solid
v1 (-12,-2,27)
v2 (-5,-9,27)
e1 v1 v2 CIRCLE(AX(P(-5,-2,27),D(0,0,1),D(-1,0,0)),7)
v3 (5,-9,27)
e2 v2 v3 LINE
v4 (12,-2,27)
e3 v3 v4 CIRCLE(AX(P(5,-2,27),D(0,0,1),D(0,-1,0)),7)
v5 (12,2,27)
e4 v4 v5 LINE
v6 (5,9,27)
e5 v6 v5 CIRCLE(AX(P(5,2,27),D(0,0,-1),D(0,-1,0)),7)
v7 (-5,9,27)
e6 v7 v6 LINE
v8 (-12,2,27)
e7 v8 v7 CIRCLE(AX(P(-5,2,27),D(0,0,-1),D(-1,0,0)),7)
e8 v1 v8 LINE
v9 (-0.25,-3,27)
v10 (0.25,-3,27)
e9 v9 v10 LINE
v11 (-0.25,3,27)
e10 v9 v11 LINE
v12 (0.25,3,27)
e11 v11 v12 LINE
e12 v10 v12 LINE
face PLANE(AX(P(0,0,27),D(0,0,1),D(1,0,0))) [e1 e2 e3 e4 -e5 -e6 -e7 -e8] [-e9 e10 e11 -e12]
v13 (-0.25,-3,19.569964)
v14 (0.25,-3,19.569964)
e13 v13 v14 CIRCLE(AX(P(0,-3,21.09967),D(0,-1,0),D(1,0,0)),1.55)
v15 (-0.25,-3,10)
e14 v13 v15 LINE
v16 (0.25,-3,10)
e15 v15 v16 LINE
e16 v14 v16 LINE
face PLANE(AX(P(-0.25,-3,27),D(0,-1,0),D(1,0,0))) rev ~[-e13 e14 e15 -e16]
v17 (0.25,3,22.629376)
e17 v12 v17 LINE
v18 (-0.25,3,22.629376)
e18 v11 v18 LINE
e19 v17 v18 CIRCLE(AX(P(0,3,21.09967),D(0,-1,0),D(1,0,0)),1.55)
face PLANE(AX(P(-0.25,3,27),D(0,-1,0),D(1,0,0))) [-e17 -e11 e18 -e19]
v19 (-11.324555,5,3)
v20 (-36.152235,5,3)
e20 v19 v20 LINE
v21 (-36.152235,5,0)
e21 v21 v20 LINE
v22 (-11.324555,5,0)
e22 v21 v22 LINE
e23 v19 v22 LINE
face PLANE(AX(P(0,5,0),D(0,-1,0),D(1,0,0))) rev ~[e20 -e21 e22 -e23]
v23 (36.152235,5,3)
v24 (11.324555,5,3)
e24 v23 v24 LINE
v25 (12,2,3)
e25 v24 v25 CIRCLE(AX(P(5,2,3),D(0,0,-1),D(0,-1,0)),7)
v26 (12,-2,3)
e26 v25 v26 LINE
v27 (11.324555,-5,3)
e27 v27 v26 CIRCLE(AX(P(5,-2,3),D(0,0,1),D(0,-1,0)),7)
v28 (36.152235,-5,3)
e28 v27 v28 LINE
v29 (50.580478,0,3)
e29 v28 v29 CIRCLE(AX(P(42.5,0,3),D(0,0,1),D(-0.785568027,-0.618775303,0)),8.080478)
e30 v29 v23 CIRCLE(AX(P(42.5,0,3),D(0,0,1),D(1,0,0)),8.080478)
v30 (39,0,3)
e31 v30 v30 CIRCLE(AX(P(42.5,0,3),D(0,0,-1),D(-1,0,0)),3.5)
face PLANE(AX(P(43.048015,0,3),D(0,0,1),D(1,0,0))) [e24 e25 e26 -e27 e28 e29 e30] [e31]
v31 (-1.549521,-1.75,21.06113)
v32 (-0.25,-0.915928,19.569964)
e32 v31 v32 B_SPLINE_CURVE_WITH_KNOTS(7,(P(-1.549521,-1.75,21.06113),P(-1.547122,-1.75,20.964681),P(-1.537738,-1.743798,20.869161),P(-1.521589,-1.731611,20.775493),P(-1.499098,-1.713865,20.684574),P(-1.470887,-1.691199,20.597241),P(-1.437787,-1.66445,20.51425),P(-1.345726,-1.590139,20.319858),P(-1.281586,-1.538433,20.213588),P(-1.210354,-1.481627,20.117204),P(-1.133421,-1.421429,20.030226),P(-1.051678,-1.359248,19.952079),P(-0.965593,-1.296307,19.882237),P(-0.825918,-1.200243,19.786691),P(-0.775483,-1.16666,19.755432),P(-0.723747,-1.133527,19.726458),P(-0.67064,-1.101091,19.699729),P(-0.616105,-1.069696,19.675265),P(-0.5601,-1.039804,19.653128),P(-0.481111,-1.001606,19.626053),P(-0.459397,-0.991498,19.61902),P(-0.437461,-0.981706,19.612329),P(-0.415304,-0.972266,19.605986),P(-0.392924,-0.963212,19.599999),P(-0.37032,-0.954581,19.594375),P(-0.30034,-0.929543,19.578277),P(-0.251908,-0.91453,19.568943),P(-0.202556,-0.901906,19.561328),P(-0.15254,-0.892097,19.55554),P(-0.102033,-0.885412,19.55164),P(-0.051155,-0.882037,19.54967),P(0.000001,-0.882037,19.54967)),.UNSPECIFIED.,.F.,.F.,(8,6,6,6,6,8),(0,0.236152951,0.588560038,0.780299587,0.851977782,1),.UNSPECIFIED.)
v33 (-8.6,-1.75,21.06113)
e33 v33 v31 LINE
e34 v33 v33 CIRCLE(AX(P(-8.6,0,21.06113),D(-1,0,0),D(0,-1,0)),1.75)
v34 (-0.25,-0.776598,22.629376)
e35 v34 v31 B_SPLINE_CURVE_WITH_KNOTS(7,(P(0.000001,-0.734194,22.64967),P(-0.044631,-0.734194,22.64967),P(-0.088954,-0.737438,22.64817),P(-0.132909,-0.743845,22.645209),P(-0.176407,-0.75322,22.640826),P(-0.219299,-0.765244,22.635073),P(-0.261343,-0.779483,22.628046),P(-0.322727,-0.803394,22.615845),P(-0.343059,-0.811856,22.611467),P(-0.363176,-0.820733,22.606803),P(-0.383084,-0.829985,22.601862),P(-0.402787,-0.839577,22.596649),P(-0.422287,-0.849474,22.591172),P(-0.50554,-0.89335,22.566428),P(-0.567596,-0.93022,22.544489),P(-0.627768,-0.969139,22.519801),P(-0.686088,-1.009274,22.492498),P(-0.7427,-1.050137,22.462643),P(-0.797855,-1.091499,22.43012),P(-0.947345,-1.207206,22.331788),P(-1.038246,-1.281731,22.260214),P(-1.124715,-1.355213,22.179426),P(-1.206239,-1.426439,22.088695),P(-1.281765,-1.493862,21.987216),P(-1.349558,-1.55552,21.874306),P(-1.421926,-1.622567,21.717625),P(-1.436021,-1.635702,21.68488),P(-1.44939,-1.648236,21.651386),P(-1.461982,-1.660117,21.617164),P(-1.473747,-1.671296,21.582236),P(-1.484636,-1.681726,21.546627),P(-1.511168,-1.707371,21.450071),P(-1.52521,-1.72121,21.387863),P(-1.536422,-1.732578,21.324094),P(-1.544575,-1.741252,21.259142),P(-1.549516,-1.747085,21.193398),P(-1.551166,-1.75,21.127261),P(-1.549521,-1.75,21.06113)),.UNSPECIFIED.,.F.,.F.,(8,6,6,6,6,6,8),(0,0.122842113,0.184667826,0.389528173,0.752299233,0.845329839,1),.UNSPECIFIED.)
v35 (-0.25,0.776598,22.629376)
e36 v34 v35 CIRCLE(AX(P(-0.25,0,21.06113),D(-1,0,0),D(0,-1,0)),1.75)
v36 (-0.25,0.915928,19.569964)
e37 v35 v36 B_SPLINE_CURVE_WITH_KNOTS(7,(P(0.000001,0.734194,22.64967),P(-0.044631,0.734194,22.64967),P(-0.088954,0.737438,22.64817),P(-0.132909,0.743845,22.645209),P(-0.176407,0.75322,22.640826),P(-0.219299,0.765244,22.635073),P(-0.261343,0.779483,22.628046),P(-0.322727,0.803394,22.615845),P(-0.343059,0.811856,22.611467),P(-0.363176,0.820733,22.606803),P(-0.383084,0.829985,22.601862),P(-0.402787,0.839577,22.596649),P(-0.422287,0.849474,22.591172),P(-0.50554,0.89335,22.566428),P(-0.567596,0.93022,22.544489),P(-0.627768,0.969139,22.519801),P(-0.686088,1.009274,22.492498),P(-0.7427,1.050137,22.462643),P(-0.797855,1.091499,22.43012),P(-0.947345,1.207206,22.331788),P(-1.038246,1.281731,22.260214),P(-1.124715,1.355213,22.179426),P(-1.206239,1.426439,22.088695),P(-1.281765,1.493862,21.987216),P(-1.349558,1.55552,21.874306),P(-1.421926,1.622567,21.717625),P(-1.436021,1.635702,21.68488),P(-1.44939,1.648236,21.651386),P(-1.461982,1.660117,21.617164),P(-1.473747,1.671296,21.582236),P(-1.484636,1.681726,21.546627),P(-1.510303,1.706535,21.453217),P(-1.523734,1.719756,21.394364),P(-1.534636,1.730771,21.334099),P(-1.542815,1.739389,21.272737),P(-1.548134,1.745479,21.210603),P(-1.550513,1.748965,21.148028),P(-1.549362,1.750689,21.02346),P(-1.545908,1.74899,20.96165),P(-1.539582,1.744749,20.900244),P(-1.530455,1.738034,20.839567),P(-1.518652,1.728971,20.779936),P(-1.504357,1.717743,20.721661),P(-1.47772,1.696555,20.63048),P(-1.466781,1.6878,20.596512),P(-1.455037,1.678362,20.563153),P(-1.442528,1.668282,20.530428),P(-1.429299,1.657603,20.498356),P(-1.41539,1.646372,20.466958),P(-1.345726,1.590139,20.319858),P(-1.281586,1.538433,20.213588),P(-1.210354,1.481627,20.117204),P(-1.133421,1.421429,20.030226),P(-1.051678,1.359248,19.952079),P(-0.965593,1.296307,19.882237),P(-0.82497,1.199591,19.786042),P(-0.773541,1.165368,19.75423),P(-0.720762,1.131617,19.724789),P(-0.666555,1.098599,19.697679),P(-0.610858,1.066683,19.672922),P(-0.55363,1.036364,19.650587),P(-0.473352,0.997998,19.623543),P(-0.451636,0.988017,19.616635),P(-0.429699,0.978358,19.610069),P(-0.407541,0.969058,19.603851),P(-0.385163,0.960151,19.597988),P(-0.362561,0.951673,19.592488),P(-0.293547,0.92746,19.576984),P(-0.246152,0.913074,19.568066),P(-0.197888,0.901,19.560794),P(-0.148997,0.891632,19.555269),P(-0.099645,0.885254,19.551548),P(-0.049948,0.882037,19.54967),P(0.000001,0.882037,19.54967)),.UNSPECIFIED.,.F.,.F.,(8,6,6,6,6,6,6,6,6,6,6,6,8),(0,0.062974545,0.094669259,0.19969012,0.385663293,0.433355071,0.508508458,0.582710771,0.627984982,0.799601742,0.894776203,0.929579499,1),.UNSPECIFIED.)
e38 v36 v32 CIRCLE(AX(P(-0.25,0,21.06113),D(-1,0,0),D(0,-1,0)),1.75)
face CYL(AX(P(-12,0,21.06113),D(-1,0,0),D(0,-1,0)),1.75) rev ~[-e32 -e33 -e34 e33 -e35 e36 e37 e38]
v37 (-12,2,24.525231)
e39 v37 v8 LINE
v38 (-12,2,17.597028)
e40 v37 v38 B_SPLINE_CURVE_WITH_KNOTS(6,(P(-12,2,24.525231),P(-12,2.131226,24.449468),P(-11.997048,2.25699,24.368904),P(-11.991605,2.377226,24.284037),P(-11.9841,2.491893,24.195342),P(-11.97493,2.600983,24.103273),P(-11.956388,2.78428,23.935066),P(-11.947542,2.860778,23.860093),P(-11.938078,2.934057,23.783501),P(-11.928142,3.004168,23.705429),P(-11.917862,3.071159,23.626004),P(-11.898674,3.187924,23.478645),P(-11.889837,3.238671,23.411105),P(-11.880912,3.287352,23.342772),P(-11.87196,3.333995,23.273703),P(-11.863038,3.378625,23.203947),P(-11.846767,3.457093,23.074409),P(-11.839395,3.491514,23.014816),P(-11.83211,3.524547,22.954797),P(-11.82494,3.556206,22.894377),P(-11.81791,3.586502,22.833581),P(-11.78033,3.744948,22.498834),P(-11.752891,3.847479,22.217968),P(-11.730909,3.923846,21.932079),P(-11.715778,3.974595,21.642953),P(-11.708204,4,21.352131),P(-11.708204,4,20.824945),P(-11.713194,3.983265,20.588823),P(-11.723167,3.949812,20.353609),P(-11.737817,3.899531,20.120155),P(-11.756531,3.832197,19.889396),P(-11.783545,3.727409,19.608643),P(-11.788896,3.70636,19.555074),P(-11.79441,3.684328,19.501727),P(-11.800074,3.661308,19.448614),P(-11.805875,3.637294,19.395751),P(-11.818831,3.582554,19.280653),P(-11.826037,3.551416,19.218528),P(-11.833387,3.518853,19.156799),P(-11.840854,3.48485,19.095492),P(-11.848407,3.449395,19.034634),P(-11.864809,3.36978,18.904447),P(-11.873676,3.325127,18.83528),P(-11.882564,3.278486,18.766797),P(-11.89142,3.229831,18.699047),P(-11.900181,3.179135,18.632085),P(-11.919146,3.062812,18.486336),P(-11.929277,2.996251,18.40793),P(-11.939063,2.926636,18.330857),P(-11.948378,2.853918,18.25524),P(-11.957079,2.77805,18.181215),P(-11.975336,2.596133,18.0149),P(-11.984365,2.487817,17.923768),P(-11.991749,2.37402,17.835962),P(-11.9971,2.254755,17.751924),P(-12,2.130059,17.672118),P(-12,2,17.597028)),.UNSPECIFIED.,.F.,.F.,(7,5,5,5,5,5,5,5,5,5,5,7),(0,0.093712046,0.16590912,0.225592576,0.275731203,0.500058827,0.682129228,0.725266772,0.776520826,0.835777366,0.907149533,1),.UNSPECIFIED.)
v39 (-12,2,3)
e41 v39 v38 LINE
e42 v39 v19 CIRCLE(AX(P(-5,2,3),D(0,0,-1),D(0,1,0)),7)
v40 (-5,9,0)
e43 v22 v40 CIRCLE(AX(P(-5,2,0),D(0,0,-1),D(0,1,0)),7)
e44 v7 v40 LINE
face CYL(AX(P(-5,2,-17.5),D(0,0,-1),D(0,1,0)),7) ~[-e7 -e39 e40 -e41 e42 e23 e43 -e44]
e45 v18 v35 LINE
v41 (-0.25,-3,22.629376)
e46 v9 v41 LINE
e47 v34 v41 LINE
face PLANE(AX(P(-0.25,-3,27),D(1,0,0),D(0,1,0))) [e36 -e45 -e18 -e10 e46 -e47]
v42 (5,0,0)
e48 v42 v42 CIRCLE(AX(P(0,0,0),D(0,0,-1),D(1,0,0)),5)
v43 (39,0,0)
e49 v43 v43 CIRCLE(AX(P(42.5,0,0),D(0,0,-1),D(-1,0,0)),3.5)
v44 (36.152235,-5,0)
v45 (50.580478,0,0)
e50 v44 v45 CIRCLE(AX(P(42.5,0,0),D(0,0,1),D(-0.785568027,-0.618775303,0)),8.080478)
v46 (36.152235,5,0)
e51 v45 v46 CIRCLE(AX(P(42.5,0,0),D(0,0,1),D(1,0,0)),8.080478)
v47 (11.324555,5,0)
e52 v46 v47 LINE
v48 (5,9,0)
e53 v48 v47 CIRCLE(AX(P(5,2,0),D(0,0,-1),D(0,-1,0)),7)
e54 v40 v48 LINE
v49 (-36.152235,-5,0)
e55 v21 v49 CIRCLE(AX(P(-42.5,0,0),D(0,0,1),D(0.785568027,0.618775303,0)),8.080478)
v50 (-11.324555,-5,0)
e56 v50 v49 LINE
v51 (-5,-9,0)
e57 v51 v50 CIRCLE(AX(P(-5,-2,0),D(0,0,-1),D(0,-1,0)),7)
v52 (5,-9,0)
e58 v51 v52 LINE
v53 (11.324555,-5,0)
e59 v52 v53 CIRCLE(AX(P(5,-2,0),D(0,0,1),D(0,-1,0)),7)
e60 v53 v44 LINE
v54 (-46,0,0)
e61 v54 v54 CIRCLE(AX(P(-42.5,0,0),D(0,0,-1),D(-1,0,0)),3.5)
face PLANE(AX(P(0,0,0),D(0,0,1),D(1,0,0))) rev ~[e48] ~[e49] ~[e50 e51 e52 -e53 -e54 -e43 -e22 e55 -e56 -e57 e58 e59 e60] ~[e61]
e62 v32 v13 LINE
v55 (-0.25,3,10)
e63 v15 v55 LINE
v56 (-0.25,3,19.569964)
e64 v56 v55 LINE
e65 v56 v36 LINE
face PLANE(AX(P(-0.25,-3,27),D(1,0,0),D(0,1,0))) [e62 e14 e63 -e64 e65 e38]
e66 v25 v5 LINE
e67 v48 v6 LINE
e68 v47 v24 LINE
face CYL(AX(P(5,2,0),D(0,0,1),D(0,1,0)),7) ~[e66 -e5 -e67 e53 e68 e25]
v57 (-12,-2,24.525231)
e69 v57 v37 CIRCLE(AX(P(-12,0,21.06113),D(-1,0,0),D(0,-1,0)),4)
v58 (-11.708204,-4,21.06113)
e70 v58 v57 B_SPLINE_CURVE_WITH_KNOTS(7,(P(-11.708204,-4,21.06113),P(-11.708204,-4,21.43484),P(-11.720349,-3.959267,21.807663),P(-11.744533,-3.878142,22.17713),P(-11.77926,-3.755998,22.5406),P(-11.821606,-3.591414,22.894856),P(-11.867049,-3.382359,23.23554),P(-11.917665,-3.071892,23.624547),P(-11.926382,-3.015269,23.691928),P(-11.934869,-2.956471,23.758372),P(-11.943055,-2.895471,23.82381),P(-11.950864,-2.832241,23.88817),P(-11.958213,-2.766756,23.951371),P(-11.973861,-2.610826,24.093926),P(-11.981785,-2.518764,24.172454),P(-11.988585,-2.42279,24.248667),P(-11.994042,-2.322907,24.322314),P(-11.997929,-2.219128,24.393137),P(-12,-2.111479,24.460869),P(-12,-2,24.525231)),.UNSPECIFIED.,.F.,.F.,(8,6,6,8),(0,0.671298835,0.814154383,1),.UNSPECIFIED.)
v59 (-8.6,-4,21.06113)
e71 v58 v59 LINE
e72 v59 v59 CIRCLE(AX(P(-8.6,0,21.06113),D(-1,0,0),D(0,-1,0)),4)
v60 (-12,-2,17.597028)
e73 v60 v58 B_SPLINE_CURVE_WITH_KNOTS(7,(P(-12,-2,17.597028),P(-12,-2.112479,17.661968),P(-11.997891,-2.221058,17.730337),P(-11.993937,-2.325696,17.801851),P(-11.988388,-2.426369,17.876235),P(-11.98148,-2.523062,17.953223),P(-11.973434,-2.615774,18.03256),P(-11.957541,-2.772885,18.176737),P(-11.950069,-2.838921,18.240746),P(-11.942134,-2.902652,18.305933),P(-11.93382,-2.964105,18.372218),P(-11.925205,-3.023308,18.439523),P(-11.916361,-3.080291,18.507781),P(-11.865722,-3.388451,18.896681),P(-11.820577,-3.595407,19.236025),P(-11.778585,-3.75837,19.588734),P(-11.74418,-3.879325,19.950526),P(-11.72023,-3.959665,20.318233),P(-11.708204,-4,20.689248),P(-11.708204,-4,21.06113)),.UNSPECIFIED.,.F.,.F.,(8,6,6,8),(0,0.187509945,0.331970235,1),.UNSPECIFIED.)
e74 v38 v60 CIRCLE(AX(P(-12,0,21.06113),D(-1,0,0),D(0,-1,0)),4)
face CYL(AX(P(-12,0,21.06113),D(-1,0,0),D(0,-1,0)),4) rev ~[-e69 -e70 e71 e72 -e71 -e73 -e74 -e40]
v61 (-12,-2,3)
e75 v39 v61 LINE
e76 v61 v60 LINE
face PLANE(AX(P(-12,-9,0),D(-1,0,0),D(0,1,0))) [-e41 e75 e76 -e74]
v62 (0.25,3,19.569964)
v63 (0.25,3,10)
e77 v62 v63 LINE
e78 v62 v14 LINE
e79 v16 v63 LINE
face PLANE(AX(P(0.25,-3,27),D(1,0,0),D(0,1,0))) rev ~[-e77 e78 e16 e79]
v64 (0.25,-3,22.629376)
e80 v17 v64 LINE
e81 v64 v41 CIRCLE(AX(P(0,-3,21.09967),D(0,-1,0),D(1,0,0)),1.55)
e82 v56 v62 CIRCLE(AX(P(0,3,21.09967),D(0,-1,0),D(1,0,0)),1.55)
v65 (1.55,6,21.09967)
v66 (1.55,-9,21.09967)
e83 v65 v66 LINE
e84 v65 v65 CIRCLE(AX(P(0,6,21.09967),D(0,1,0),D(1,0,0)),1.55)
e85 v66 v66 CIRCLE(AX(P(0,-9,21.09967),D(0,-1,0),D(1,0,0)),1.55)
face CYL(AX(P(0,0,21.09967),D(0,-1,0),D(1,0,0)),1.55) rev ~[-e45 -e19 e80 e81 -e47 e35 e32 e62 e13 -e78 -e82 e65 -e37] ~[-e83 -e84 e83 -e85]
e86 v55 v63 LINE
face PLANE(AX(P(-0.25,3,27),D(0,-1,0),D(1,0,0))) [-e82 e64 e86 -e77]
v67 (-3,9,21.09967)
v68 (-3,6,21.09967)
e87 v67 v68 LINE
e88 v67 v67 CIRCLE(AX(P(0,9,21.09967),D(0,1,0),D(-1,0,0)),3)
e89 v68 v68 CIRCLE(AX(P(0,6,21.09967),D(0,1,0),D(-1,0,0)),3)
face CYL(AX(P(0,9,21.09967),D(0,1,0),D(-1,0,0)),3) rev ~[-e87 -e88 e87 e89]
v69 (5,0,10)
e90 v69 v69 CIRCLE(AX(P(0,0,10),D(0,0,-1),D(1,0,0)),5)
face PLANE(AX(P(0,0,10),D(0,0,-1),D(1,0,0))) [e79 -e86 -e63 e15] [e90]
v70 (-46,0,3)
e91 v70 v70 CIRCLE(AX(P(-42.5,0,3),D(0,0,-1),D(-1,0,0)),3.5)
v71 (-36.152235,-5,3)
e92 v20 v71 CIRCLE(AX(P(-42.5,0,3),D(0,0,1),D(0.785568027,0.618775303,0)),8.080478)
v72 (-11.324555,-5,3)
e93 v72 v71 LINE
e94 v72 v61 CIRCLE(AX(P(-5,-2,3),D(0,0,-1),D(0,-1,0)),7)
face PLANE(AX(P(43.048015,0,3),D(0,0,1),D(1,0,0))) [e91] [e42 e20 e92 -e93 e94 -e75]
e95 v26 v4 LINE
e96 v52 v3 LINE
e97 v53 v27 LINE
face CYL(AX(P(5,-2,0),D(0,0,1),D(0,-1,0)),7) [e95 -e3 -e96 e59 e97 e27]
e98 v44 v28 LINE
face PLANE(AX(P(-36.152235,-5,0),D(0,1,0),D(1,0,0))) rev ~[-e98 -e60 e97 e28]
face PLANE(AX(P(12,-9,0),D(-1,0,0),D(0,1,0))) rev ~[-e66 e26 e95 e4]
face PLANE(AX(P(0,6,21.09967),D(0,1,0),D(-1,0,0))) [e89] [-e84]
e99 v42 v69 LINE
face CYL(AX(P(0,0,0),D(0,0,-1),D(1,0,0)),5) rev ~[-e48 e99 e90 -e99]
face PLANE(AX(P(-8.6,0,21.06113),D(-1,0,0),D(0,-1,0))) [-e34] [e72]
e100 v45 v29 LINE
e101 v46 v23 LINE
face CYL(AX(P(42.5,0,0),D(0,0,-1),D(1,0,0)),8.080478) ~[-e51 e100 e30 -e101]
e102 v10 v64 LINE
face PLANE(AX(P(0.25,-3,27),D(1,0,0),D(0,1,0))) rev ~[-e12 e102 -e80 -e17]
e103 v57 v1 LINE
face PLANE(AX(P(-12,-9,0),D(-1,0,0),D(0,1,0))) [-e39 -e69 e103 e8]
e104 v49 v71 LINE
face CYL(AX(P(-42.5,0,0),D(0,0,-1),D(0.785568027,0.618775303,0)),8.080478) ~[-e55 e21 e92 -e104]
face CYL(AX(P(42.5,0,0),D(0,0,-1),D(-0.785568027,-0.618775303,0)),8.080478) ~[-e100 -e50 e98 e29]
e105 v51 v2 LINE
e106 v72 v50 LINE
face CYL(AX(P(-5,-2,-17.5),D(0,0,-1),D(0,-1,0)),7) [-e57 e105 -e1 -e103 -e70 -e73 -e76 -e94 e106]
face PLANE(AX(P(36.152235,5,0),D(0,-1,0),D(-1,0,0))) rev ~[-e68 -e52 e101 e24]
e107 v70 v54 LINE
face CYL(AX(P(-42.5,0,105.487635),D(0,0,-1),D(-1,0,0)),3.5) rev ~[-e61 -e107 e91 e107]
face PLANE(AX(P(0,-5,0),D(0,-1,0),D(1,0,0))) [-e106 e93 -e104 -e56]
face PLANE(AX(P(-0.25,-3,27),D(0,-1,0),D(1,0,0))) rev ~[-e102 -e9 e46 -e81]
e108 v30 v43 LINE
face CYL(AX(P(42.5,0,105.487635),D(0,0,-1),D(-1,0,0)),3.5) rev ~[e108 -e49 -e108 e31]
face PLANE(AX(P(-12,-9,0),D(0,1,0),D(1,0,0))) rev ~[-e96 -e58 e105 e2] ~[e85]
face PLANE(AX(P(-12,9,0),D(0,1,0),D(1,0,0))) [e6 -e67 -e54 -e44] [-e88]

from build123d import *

# Parameters (mm, degrees)
F1_DEPTH     = 3
F3_D         = 7
F4_W         = 24
F4_H         = 18
F5_DEPTH     = 27
F6_R         = 1.55
F7_DEPTH     = 12.5
F8_R         = 1.75
F9_DEPTH     = 12
F10_R        = 4
F11_DEPTH    = 3.4
F12_T4_DEPTH = 62
F12_T9_DEPTH = 62
F13_R        = 7
F14_T4_DEPTH = 62
F14_T9_DEPTH = 62
F15_R        = 7
F16_W        = 0.5
F16_H        = 6
F17_DEPTH    = 20
F18_R        = 5
F19_DEPTH    = 10
F20_R        = 3
F20_R_2      = 1.55
F21_DEPTH    = 3


# Not quite as in the source:
# - a fillet or chamfer that OpenCascade refuses, or shapes differently, is made with other operations: its cross-section is extruded or revolved along the edge and cut away or added


with BuildPart() as f1:
    # F0 (on Top) → F1 (new body)
    with BuildSketch(Plane.XY):
        with BuildLine():
            Line((42.5, 5), (42.5, -5))
            Line((42.5, -5), (36.1522351233, -5))
            ThreePointArc((36.1522351233, -5), (45.1458596679, -7.635020992), (50.5804776424, 0))
            ThreePointArc((50.5804776424, 0), (45.1458596679, 7.635020992), (36.1522351233, 5))
            Line((36.1522351233, 5), (42.5, 5))
        make_face()
        with BuildLine():
            ThreePointArc((-36.1522351233, 5), (-50.5804776424, 0), (-36.1522351233, -5))
            Line((-36.1522351233, -5), (-42.5, -5))
            Line((-42.5, -5), (-42.5, 5))
            Line((-42.5, 5), (-36.1522351233, 5))
        make_face()
        with BuildLine():
            Line((36.1522351233, -5), (42.5, -5))
            Line((42.5, -5), (42.5, 5))
            Line((42.5, 5), (36.1522351233, 5))
            ThreePointArc((36.1522351233, 5), (34.4195223576, 0), (36.1522351233, -5))
        make_face()
        with BuildLine():
            Line((-36.1522351233, -5), (36.1522351233, -5))
            ThreePointArc((36.1522351233, -5), (34.4195223576, 0), (36.1522351233, 5))
            Line((36.1522351233, 5), (-36.1522351233, 5))
            ThreePointArc((-36.1522351233, 5), (-34.864979008, 2.6458596679), (-34.4195223576, 0))
            ThreePointArc((-34.4195223576, 0), (-34.864979008, -2.6458596679), (-36.1522351233, -5))
        make_face()
        with BuildLine():
            Line((-42.5, -5), (-36.1522351233, -5))
            ThreePointArc((-36.1522351233, -5), (-34.864979008, -2.6458596679), (-34.4195223576, 0))
            ThreePointArc((-34.4195223576, 0), (-34.864979008, 2.6458596679), (-36.1522351233, 5))
            Line((-36.1522351233, 5), (-42.5, 5))
            Line((-42.5, 5), (-42.5, -5))
        make_face()
    extrude(amount=F1_DEPTH)

    # F3 (through all)
    with Locations(Plane.XY.offset(3)):
        with Locations((-42.5, 0), (42.5, 0)):
            Hole(F3_D / 2)

    # F4 (on Top) → F5 (join)
    with BuildSketch(Plane.XY):
        Rectangle(F4_W, F4_H)
    extrude(amount=F5_DEPTH)

    # F6 (on Front) → F7 (cut, symmetric)
    with BuildSketch(Plane.XZ):
        with Locations((0, 21.0996698588)):
            Circle(F6_R)
    extrude(amount=F7_DEPTH, both=True, mode=Mode.SUBTRACT)

    # F8 (on face) → F9 (cut)
    with BuildSketch(Plane(origin=(-12, 0, 0), x_dir=(0, -1, 0), z_dir=(-1, 0, 0))):
        with Locations((0, 21.061129868)):
            Circle(F8_R)
    extrude(amount=-F9_DEPTH, mode=Mode.SUBTRACT)

    # F10 (on face) → F11 (cut)
    with BuildSketch(Plane(origin=(-12, 0, 0), x_dir=(0, -1, 0), z_dir=(-1, 0, 0))):
        with Locations((0, 21.061129868)):
            Circle(F10_R)
    extrude(amount=-F11_DEPTH, mode=Mode.SUBTRACT)

    # F12: fillet of radius 7 on 1 edges, made by hand


with BuildPart() as f12_tool2:
    # F12_s3 → F12_t4 (new body)
    with BuildSketch(Plane.XY.offset(-17.5)):
        with BuildLine():
            ThreePointArc((-5, 9), (-9.9497474683, 6.9497474683), (-12, 2))
            Line((-12, 2), (-12, 9))
            Line((-12, 9), (-5, 9))
        make_face()
    extrude(amount=F12_T4_DEPTH)

    split(bisect_by=Plane.XZ.offset(-5), keep=Keep.BOTTOM)


with BuildPart() as f1_1:
    add(f1.part)

    # F12_t1: cut F12_tool2
    add(f12_tool2.part, mode=Mode.SUBTRACT)


with BuildPart() as f12_tool7:
    # F12_s8 → F12_t9 (new body)
    with BuildSketch(Plane.XY.offset(-17.5)):
        with BuildLine():
            ThreePointArc((-5, 9), (-9.9497474683, 6.9497474683), (-12, 2))
            Line((-12, 2), (-12, 9))
            Line((-12, 9), (-5, 9))
        make_face()
    extrude(amount=F12_T9_DEPTH)

    split(bisect_by=Plane.XY.offset(3), keep=Keep.TOP)


with BuildPart() as f1_2:
    add(f1_1.part)

    # F12_t6: cut F12_tool7
    add(f12_tool7.part, mode=Mode.SUBTRACT)

    # F13
    f13_edges = [f1_2.edges().sort_by_distance(p)[0] for p in [
        (12, 9, 13.5),
    ]]
    fillet(f13_edges, radius=F13_R)

    # F14: fillet of radius 7 on 1 edges, made by hand


with BuildPart() as f14_tool2:
    # F14_s3 → F14_t4 (new body)
    with BuildSketch(Plane.XY.offset(-17.5)):
        with BuildLine():
            ThreePointArc((-5, -9), (-9.9497474683, -6.9497474683), (-12, -2))
            Line((-12, -2), (-12, -9))
            Line((-12, -9), (-5, -9))
        make_face()
    extrude(amount=F14_T4_DEPTH)

    split(bisect_by=Plane.XZ.offset(5), keep=Keep.TOP)


with BuildPart() as f1_3:
    add(f1_2.part)

    # F14_t1: cut F14_tool2
    add(f14_tool2.part, mode=Mode.SUBTRACT)


with BuildPart() as f14_tool7:
    # F14_s8 → F14_t9 (new body)
    with BuildSketch(Plane.XY.offset(-17.5)):
        with BuildLine():
            ThreePointArc((-5, -9), (-9.9497474683, -6.9497474683), (-12, -2))
            Line((-12, -2), (-12, -9))
            Line((-12, -9), (-5, -9))
        make_face()
    extrude(amount=F14_T9_DEPTH)

    split(bisect_by=Plane.XY.offset(3), keep=Keep.TOP)


with BuildPart() as f1_4:
    add(f1_3.part)

    # F14_t6: cut F14_tool7
    add(f14_tool7.part, mode=Mode.SUBTRACT)

    # F15
    f15_edges = [f1_4.edges().sort_by_distance(p)[0] for p in [
        (12, -9, 13.5),
    ]]
    fillet(f15_edges, radius=F15_R)

    # F16 (on face) → F17 (cut)
    with BuildSketch(Plane.XY.offset(27)):
        Rectangle(F16_W, F16_H)
    extrude(amount=-F17_DEPTH, mode=Mode.SUBTRACT)

    # F18 (on face) → F19 (cut)
    with BuildSketch(Plane(origin=(0, 0, 0), x_dir=(1, 0, 0), z_dir=(0, 0, -1))):
        Circle(F18_R)
    extrude(amount=-F19_DEPTH, mode=Mode.SUBTRACT)

    # F20 (on face) → F21 (cut)
    with BuildSketch(Plane(origin=(0, 9, 0), x_dir=(-1, 0, 0), z_dir=(0, 1, 0))):
        with Locations((0, 21.0996698588)):
            Circle(F20_R)
        with Locations((0, 21.0996698588)):
            Circle(F20_R_2, mode=Mode.SUBTRACT)
    extrude(amount=-F21_DEPTH, mode=Mode.SUBTRACT)


solid = f1_4.part
